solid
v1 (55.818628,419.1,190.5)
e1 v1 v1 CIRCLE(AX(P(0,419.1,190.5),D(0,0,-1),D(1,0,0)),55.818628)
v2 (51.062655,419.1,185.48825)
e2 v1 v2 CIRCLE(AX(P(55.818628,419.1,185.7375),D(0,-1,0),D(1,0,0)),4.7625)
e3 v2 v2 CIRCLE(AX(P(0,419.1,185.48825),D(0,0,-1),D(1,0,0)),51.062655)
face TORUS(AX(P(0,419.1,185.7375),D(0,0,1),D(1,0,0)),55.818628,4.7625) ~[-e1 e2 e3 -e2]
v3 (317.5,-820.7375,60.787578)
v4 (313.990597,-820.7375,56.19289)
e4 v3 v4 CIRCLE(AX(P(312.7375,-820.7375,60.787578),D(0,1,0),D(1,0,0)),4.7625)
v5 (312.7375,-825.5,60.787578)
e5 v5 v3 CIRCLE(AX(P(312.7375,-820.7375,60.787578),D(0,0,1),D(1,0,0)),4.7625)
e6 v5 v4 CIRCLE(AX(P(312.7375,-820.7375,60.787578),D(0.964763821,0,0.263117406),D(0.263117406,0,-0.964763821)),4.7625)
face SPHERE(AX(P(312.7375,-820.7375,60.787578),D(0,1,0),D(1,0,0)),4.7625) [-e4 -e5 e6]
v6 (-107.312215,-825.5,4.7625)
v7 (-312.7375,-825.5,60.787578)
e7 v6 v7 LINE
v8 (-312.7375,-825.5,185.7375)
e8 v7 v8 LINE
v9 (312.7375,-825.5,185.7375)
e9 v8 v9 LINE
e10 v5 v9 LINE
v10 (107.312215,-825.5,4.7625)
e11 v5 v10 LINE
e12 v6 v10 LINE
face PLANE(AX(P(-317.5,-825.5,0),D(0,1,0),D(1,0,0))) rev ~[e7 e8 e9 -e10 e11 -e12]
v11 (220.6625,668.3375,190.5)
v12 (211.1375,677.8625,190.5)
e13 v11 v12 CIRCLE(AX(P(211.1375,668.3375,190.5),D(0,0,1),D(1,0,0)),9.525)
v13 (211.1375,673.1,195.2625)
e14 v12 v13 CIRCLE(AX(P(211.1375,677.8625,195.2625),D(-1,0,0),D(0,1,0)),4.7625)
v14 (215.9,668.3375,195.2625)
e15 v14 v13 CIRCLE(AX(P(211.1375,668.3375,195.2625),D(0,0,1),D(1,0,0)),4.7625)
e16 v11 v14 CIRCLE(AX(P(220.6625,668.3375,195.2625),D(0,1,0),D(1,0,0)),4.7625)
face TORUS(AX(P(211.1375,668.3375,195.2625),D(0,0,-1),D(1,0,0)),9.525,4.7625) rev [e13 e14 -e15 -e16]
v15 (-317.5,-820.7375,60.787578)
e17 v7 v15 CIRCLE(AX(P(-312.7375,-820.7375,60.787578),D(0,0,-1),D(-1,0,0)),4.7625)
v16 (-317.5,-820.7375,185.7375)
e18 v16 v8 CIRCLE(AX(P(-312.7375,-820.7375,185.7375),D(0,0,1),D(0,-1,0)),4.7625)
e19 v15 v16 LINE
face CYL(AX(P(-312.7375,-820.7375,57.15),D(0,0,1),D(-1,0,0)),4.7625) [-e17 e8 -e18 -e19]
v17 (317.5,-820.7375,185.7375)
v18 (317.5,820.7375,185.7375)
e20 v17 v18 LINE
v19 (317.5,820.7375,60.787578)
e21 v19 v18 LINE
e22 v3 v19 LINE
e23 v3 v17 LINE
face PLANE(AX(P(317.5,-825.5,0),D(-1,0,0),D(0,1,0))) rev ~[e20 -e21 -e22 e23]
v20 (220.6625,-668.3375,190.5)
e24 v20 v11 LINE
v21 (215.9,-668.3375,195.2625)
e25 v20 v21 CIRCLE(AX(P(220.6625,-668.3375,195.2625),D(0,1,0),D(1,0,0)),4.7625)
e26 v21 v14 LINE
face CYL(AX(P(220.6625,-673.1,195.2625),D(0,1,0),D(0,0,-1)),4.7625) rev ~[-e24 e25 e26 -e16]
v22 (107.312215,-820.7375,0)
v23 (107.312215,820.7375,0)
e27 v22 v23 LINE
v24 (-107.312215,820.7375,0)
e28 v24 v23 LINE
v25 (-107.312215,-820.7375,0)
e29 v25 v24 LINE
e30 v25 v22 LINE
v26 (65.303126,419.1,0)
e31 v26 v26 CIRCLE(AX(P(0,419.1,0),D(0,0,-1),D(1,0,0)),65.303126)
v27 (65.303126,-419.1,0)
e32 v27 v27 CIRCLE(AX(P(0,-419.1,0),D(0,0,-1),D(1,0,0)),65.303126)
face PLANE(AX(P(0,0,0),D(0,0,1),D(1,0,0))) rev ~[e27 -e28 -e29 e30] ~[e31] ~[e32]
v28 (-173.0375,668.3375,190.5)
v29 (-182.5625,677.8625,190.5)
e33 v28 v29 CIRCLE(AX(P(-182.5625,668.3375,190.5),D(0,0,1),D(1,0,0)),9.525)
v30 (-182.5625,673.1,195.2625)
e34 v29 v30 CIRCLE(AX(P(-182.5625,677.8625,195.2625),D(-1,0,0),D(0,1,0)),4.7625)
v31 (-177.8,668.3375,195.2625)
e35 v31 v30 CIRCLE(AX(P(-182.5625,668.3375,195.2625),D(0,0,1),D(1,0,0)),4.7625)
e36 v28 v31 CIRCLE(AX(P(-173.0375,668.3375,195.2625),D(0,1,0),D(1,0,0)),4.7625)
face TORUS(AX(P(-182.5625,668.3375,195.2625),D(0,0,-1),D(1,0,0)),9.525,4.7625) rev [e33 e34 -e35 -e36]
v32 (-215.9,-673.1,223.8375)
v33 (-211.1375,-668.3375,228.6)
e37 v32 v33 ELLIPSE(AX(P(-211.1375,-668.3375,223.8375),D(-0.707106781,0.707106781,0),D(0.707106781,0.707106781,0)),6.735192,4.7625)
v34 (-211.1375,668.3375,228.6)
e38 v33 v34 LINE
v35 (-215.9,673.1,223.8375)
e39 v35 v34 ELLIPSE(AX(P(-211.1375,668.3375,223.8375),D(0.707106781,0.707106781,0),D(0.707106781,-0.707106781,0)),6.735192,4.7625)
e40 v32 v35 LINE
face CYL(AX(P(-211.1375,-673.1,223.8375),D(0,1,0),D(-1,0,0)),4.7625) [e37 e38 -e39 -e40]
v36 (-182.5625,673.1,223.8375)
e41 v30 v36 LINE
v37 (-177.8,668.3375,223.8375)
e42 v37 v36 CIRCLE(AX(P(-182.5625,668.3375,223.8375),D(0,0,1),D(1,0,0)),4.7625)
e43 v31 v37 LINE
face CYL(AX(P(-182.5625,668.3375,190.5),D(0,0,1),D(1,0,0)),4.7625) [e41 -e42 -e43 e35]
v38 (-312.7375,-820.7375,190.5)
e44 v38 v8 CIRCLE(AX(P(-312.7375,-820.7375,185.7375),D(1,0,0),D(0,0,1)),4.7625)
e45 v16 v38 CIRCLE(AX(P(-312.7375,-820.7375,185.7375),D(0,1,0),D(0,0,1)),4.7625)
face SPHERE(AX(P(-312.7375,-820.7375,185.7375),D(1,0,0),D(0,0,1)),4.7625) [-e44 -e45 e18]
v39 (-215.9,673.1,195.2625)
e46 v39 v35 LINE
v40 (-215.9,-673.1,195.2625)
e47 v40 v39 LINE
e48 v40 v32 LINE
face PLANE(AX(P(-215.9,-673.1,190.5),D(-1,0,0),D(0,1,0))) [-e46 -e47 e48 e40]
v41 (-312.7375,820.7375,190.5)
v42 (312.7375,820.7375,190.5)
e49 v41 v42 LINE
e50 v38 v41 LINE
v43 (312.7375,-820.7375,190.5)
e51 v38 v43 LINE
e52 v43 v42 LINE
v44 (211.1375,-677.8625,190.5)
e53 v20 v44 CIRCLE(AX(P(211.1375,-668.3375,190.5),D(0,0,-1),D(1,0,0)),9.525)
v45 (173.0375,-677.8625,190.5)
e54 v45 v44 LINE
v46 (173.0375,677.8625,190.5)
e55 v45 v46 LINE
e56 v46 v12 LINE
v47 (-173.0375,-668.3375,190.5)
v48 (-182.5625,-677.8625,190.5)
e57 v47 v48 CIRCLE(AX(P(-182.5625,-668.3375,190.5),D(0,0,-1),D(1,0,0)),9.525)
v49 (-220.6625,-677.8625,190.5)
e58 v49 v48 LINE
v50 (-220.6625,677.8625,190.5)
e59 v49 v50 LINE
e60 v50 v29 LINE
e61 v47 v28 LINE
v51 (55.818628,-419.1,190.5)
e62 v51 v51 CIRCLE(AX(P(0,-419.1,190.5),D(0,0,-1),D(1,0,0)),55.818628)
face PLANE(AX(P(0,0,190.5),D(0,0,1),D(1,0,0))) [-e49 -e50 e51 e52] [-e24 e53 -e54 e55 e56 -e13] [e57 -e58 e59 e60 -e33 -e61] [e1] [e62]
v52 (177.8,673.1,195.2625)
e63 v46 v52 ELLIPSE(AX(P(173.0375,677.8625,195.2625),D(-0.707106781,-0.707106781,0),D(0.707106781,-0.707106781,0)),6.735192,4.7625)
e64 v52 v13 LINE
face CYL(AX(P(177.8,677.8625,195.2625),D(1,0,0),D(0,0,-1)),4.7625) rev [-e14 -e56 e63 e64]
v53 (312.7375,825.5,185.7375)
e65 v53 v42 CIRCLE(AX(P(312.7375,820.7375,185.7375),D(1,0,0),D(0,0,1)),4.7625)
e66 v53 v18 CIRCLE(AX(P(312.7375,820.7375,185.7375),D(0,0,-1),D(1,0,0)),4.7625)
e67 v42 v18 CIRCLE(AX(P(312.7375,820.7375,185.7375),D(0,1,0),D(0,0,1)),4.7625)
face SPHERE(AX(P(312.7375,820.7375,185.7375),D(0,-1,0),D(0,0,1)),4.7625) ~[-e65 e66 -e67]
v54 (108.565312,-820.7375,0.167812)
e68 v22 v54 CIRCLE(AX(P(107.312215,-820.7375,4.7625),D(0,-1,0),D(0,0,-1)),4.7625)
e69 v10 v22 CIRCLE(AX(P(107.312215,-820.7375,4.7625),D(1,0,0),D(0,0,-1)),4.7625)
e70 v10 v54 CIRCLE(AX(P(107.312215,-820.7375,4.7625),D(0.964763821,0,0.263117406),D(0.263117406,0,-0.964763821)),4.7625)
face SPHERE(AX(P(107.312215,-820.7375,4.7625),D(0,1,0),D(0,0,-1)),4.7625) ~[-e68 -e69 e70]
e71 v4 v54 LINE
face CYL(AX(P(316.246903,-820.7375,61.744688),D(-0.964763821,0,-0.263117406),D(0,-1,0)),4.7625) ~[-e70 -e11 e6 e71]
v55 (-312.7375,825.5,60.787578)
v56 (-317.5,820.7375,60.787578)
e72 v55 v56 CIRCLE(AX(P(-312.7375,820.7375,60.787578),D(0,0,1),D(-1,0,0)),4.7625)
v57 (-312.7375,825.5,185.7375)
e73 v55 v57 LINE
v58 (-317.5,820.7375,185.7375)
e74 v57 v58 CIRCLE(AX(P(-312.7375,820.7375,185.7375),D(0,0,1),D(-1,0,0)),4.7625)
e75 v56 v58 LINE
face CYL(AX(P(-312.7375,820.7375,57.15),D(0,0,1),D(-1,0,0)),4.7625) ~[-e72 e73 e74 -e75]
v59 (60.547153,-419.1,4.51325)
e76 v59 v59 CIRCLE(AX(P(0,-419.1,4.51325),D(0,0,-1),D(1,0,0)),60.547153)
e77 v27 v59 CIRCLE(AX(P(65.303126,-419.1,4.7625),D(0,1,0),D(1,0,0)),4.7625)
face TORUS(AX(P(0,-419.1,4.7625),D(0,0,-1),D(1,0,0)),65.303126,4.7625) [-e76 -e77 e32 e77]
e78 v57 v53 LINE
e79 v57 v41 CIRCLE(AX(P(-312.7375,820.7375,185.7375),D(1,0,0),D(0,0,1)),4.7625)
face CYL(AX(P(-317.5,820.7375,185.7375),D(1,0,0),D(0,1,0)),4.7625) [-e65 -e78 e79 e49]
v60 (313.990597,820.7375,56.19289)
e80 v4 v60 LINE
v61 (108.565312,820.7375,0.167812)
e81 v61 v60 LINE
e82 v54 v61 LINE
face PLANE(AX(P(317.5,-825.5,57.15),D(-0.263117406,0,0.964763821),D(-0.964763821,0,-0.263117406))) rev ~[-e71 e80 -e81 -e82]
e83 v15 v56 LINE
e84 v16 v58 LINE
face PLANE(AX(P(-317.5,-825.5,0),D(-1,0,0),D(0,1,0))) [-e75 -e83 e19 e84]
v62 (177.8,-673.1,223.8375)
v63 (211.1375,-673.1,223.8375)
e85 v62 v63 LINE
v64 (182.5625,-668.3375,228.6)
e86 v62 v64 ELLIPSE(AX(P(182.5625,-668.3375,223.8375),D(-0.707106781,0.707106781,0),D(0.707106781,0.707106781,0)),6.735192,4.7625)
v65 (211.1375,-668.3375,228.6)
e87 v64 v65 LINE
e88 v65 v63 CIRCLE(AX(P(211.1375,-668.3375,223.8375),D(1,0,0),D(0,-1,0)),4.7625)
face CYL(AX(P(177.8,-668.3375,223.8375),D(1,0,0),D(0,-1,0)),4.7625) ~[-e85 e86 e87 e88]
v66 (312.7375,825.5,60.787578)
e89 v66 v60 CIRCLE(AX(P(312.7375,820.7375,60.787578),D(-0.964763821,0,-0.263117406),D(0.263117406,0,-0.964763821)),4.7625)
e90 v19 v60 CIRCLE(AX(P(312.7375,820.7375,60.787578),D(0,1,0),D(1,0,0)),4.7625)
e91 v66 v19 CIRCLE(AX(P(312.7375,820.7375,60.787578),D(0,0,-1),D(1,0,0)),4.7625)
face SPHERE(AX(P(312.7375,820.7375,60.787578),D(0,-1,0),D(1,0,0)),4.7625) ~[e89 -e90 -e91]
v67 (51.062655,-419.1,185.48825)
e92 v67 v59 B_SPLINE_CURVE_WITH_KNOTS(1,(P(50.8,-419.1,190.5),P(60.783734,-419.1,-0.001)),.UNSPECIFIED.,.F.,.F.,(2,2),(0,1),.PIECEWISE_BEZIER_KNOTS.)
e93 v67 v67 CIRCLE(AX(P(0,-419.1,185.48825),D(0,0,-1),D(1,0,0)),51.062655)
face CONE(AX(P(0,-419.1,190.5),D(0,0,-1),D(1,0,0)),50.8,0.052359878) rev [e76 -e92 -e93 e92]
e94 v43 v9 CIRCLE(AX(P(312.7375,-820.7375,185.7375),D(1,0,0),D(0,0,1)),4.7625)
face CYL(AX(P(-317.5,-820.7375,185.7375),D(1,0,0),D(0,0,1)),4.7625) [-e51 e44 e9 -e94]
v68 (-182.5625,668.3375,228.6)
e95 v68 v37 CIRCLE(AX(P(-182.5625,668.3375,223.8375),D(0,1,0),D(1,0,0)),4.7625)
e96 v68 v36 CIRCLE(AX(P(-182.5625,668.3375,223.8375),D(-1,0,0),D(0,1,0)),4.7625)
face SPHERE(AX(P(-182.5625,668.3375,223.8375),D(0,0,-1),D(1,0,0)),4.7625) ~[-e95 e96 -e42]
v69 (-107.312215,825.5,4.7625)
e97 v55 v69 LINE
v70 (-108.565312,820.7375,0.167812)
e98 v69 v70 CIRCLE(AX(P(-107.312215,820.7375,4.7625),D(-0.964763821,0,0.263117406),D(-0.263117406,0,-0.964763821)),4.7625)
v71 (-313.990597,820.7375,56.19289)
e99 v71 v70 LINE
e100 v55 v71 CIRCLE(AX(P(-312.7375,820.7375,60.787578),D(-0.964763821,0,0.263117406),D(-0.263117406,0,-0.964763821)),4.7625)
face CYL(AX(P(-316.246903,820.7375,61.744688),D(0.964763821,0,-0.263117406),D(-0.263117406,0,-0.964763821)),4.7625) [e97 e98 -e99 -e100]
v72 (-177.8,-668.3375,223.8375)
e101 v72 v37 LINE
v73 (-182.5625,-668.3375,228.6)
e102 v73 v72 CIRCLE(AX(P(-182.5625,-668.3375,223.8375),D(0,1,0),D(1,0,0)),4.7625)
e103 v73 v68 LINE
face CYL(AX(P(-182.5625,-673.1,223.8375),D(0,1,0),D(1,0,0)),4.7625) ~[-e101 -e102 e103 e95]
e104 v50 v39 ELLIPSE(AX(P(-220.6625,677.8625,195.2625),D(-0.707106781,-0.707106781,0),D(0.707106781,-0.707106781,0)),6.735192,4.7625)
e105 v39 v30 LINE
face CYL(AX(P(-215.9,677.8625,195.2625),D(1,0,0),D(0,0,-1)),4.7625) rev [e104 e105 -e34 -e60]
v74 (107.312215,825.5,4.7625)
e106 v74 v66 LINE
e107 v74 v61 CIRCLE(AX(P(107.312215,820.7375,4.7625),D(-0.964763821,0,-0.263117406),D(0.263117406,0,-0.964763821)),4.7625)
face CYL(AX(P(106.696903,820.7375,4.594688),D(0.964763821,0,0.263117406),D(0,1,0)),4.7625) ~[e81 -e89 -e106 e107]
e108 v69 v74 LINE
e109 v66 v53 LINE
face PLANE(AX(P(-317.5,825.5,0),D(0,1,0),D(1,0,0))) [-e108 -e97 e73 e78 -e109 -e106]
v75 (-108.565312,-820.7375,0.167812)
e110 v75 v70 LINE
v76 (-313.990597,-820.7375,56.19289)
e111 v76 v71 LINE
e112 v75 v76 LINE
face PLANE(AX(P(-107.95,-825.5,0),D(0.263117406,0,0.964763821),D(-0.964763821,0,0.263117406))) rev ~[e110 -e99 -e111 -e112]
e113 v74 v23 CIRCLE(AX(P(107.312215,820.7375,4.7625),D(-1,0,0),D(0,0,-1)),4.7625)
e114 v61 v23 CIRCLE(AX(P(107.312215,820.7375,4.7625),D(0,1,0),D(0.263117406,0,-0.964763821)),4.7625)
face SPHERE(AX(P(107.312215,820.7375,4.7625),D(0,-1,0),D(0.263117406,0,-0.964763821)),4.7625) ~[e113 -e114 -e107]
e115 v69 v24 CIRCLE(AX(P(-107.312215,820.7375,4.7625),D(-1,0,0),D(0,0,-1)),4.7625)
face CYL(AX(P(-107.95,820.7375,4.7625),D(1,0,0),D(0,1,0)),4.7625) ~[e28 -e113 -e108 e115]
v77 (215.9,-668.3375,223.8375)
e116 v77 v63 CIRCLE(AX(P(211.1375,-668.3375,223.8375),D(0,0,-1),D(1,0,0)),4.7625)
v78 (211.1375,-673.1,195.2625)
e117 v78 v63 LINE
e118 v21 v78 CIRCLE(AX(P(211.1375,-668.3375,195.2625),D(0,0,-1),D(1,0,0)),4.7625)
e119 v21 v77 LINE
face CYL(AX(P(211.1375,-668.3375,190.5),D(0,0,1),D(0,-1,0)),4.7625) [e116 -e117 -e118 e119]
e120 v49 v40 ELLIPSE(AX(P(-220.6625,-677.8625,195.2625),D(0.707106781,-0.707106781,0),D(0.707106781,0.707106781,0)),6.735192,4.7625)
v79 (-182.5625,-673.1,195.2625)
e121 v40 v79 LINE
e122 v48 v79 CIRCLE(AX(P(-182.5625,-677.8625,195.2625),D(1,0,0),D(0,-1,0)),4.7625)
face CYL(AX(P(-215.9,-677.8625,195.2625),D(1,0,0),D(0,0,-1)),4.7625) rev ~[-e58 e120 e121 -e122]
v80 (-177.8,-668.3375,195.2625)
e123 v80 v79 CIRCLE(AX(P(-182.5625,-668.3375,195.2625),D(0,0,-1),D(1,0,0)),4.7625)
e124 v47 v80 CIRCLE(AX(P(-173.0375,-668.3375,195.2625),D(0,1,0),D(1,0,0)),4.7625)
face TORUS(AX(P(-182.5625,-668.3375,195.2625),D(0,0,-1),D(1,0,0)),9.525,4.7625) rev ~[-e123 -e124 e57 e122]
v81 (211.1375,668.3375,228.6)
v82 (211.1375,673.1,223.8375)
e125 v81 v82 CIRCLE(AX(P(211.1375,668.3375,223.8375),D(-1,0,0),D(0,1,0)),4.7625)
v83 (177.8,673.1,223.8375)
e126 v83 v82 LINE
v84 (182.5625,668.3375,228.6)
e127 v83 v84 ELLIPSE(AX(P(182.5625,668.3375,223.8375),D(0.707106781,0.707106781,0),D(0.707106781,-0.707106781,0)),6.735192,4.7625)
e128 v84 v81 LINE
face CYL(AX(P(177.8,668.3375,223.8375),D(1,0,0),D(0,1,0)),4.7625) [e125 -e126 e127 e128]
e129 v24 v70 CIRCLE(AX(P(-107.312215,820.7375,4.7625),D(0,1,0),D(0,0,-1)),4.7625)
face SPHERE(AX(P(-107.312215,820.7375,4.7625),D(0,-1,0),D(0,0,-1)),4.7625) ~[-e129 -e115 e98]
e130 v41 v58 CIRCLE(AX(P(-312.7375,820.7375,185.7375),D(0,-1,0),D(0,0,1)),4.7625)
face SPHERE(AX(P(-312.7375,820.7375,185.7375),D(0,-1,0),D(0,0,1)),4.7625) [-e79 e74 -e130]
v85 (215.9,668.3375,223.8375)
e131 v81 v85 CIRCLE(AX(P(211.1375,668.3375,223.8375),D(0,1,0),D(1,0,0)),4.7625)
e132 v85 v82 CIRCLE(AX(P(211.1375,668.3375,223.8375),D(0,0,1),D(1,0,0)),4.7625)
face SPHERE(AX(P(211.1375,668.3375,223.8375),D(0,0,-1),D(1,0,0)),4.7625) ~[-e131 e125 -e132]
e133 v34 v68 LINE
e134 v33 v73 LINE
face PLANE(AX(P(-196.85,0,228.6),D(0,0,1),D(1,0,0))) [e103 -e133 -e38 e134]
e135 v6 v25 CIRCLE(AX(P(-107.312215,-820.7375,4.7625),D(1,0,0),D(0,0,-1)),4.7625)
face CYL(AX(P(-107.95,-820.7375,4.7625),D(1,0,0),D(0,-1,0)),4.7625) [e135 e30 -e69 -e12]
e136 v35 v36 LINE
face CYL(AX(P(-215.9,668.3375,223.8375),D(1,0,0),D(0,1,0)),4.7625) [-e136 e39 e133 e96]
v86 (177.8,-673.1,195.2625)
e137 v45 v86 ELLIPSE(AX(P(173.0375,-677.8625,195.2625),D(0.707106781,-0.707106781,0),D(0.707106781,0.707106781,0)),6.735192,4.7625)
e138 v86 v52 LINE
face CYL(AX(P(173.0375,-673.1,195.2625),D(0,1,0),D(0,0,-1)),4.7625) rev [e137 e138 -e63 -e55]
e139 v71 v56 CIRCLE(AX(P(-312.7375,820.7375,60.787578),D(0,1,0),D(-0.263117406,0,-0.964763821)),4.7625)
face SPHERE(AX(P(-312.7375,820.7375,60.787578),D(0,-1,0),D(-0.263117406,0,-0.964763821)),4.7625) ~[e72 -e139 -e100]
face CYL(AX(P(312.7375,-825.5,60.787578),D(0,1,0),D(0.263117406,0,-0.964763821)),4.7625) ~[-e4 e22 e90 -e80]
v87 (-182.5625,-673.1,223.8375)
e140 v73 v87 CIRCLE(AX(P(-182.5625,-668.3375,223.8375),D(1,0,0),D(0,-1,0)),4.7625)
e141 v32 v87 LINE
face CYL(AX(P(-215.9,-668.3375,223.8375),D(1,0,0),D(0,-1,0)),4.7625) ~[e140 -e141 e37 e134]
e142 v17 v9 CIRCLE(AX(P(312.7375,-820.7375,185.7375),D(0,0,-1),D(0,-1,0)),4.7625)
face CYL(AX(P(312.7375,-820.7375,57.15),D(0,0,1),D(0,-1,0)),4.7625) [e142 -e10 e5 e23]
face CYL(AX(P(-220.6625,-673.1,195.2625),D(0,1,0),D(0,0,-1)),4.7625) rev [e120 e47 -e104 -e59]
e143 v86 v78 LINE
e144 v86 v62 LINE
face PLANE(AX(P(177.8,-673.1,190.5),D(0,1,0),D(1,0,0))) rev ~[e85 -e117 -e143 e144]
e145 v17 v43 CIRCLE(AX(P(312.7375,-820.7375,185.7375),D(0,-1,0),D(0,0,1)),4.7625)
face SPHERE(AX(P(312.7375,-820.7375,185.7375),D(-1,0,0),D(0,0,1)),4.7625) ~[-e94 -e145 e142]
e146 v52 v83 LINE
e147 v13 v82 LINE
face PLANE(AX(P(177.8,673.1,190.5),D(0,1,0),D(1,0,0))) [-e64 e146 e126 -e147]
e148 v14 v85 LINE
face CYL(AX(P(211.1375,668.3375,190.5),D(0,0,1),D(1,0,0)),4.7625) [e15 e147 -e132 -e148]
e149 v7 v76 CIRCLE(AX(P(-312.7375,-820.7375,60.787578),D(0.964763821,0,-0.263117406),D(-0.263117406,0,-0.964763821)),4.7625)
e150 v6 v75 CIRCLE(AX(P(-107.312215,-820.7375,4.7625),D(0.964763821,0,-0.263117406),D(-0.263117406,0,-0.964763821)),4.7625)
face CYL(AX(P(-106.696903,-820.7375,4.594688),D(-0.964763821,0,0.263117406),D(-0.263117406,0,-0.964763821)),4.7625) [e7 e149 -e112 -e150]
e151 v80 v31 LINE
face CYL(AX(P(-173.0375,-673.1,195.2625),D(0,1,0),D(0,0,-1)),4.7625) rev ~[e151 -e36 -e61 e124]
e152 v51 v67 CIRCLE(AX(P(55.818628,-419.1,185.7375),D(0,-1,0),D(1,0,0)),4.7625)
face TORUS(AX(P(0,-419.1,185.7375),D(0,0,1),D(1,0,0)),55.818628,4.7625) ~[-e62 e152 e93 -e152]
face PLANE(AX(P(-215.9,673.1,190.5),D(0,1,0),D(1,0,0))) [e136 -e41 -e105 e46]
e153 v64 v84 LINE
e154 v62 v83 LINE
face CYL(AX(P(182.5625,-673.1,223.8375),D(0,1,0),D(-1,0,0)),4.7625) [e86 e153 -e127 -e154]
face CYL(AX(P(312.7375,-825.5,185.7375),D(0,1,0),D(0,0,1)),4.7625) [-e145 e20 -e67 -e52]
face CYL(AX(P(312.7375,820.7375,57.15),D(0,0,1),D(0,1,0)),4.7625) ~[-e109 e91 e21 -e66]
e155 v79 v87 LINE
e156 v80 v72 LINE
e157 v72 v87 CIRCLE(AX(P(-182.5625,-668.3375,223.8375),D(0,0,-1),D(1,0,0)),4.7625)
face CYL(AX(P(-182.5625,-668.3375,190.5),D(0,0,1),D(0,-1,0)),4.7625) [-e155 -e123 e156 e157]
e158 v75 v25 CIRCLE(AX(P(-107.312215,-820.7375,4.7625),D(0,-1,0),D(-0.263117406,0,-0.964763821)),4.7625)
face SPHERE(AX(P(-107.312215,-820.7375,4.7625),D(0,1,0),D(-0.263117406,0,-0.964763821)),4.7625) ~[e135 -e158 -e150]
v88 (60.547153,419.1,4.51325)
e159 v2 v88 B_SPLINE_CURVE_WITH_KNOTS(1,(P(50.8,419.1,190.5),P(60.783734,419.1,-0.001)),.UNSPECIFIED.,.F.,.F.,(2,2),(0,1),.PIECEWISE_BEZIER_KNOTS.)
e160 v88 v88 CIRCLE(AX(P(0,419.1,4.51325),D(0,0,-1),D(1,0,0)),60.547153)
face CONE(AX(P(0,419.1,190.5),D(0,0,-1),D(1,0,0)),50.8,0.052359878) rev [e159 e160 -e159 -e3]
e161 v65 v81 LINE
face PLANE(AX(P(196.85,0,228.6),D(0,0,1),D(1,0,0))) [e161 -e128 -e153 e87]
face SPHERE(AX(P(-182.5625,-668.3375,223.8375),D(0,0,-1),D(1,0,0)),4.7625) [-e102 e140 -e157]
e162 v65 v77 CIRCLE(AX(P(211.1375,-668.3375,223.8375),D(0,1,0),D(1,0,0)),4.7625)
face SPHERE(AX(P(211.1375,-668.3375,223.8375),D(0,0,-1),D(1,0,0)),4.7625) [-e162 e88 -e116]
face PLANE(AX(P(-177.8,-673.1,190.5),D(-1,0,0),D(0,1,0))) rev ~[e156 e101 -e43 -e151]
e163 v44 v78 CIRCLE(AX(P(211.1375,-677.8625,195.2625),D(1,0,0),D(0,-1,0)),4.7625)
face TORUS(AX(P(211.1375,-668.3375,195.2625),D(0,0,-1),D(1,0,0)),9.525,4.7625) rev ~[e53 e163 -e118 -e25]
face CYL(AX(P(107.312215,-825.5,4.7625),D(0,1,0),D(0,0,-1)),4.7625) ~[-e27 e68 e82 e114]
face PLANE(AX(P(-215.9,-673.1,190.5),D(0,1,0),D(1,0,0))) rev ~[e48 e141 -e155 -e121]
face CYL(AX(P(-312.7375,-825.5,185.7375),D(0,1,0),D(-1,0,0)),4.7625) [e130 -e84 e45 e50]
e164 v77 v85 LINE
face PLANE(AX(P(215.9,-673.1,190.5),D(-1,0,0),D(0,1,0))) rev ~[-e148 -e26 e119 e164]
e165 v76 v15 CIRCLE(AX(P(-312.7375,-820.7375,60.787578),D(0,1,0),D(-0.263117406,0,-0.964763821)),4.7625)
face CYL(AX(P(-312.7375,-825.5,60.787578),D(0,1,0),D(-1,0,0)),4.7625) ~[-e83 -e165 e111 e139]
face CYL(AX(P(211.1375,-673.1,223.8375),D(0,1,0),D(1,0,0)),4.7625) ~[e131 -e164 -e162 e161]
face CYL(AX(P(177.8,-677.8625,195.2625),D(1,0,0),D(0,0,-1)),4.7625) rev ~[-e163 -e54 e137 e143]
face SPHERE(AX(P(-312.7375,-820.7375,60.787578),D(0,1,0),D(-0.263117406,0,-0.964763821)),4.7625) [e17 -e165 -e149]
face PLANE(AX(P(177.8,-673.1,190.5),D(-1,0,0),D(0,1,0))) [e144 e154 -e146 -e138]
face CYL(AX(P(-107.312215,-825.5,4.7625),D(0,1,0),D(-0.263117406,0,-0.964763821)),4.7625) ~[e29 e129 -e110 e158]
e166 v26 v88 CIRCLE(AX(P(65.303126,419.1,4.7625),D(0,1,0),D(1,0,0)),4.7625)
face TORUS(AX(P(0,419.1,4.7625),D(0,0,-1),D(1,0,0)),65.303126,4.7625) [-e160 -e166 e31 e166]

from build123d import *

# Parameters (mm, degrees)
F0_W     = 635
F0_H     = 1651
F1_DEPTH = 190.5
F3_DEPTH = 1651.001
F4_W     = 38.1
F4_H     = 1346.2
F5_DEPTH = 38.1
F7_R     = 50.8
F8_DEPTH = 190.501
F8_TAPER = -3
F9_R     = 4.7625


with BuildPart() as f1:
    # F0 (on Top) → F1 (new body)
    with BuildSketch(Plane.XY):
        Rectangle(F0_W, F0_H)
    extrude(amount=F1_DEPTH)

    # F2 (on face) → F3 (cut, through all)
    with BuildSketch(Plane.XZ.offset(825.5)):
        Polygon((317.5, 57.15), (107.95, 0), (317.5, 0), align=None)
        Polygon((-317.5, 0), (-107.95, 0), (-317.5, 57.15), align=None)
    extrude(amount=-F3_DEPTH, mode=Mode.SUBTRACT)

    # F4 (on face) → F5 (join)
    with BuildSketch(Plane.XY.offset(190.5)):
        with Locations((-196.85, 0)):
            Rectangle(F4_W, F4_H)
        with Locations((196.85, 0)):
            Rectangle(F4_W, F4_H)
    extrude(amount=F5_DEPTH)

    # F7 (on face) → F8 (cut, through all)
    with BuildSketch(Plane.XY.offset(190.5)):
        with Locations((0, -419.1)):
            Circle(F7_R)
        with Locations((0, 419.1)):
            Circle(F7_R)
    extrude(amount=-F8_DEPTH, taper=F8_TAPER, mode=Mode.SUBTRACT)

    # F9
    f9_edges = [f1.edges().sort_by_distance(p)[0] for p in [
        (-177.8, -673.1, 209.55),
        (-177.8, 673.1, 209.55),
        (-177.8, 0, 190.5),
        (-177.8, 0, 228.6),
        (-196.85, 673.1, 228.6),
        (-215.9, 0, 228.6),
        (-196.85, -673.1, 228.6),
        (215.9, -673.1, 209.55),
        (215.9, 673.1, 209.55),
        (215.9, 0, 190.5),
        (215.9, 0, 228.6),
        (196.85, 673.1, 228.6),
        (177.8, 0, 228.6),
        (196.85, -673.1, 228.6),
        (0, -825.5, 190.5),
        (-317.5, 0, 190.5),
        (317.5, 0, 190.5),
        (0, 825.5, 190.5),
        (-50.8, -419.1, 190.5),
        (-196.85, 673.1, 190.5),
        (-215.9, 0, 190.5),
        (-196.85, -673.1, 190.5),
        (196.85, 673.1, 190.5),
        (177.8, 0, 190.5),
        (196.85, -673.1, 190.5),
        (-50.8, 419.1, 190.5),
        (317.5, 0, 57.15),
        (317.5, 825.5, 123.825),
        (317.5, -825.5, 123.825),
        (-212.725, -825.5, 28.575),
        (0, -825.5, 0),
        (212.725, -825.5, 28.575),
        (-317.5, -825.5, 123.825),
        (212.725, 825.5, 28.575),
        (0, 825.5, 0),
        (-212.725, 825.5, 28.575),
        (-317.5, 825.5, 123.825),
        (-317.5, 0, 57.15),
        (-107.95, 0, 0),
        (107.95, 0, 0),
        (-60.783682, -419.1, 0),
        (-60.783682, 419.1, 0),
    ]]
    fillet(f9_edges, radius=F9_R)


solid = f1.part
